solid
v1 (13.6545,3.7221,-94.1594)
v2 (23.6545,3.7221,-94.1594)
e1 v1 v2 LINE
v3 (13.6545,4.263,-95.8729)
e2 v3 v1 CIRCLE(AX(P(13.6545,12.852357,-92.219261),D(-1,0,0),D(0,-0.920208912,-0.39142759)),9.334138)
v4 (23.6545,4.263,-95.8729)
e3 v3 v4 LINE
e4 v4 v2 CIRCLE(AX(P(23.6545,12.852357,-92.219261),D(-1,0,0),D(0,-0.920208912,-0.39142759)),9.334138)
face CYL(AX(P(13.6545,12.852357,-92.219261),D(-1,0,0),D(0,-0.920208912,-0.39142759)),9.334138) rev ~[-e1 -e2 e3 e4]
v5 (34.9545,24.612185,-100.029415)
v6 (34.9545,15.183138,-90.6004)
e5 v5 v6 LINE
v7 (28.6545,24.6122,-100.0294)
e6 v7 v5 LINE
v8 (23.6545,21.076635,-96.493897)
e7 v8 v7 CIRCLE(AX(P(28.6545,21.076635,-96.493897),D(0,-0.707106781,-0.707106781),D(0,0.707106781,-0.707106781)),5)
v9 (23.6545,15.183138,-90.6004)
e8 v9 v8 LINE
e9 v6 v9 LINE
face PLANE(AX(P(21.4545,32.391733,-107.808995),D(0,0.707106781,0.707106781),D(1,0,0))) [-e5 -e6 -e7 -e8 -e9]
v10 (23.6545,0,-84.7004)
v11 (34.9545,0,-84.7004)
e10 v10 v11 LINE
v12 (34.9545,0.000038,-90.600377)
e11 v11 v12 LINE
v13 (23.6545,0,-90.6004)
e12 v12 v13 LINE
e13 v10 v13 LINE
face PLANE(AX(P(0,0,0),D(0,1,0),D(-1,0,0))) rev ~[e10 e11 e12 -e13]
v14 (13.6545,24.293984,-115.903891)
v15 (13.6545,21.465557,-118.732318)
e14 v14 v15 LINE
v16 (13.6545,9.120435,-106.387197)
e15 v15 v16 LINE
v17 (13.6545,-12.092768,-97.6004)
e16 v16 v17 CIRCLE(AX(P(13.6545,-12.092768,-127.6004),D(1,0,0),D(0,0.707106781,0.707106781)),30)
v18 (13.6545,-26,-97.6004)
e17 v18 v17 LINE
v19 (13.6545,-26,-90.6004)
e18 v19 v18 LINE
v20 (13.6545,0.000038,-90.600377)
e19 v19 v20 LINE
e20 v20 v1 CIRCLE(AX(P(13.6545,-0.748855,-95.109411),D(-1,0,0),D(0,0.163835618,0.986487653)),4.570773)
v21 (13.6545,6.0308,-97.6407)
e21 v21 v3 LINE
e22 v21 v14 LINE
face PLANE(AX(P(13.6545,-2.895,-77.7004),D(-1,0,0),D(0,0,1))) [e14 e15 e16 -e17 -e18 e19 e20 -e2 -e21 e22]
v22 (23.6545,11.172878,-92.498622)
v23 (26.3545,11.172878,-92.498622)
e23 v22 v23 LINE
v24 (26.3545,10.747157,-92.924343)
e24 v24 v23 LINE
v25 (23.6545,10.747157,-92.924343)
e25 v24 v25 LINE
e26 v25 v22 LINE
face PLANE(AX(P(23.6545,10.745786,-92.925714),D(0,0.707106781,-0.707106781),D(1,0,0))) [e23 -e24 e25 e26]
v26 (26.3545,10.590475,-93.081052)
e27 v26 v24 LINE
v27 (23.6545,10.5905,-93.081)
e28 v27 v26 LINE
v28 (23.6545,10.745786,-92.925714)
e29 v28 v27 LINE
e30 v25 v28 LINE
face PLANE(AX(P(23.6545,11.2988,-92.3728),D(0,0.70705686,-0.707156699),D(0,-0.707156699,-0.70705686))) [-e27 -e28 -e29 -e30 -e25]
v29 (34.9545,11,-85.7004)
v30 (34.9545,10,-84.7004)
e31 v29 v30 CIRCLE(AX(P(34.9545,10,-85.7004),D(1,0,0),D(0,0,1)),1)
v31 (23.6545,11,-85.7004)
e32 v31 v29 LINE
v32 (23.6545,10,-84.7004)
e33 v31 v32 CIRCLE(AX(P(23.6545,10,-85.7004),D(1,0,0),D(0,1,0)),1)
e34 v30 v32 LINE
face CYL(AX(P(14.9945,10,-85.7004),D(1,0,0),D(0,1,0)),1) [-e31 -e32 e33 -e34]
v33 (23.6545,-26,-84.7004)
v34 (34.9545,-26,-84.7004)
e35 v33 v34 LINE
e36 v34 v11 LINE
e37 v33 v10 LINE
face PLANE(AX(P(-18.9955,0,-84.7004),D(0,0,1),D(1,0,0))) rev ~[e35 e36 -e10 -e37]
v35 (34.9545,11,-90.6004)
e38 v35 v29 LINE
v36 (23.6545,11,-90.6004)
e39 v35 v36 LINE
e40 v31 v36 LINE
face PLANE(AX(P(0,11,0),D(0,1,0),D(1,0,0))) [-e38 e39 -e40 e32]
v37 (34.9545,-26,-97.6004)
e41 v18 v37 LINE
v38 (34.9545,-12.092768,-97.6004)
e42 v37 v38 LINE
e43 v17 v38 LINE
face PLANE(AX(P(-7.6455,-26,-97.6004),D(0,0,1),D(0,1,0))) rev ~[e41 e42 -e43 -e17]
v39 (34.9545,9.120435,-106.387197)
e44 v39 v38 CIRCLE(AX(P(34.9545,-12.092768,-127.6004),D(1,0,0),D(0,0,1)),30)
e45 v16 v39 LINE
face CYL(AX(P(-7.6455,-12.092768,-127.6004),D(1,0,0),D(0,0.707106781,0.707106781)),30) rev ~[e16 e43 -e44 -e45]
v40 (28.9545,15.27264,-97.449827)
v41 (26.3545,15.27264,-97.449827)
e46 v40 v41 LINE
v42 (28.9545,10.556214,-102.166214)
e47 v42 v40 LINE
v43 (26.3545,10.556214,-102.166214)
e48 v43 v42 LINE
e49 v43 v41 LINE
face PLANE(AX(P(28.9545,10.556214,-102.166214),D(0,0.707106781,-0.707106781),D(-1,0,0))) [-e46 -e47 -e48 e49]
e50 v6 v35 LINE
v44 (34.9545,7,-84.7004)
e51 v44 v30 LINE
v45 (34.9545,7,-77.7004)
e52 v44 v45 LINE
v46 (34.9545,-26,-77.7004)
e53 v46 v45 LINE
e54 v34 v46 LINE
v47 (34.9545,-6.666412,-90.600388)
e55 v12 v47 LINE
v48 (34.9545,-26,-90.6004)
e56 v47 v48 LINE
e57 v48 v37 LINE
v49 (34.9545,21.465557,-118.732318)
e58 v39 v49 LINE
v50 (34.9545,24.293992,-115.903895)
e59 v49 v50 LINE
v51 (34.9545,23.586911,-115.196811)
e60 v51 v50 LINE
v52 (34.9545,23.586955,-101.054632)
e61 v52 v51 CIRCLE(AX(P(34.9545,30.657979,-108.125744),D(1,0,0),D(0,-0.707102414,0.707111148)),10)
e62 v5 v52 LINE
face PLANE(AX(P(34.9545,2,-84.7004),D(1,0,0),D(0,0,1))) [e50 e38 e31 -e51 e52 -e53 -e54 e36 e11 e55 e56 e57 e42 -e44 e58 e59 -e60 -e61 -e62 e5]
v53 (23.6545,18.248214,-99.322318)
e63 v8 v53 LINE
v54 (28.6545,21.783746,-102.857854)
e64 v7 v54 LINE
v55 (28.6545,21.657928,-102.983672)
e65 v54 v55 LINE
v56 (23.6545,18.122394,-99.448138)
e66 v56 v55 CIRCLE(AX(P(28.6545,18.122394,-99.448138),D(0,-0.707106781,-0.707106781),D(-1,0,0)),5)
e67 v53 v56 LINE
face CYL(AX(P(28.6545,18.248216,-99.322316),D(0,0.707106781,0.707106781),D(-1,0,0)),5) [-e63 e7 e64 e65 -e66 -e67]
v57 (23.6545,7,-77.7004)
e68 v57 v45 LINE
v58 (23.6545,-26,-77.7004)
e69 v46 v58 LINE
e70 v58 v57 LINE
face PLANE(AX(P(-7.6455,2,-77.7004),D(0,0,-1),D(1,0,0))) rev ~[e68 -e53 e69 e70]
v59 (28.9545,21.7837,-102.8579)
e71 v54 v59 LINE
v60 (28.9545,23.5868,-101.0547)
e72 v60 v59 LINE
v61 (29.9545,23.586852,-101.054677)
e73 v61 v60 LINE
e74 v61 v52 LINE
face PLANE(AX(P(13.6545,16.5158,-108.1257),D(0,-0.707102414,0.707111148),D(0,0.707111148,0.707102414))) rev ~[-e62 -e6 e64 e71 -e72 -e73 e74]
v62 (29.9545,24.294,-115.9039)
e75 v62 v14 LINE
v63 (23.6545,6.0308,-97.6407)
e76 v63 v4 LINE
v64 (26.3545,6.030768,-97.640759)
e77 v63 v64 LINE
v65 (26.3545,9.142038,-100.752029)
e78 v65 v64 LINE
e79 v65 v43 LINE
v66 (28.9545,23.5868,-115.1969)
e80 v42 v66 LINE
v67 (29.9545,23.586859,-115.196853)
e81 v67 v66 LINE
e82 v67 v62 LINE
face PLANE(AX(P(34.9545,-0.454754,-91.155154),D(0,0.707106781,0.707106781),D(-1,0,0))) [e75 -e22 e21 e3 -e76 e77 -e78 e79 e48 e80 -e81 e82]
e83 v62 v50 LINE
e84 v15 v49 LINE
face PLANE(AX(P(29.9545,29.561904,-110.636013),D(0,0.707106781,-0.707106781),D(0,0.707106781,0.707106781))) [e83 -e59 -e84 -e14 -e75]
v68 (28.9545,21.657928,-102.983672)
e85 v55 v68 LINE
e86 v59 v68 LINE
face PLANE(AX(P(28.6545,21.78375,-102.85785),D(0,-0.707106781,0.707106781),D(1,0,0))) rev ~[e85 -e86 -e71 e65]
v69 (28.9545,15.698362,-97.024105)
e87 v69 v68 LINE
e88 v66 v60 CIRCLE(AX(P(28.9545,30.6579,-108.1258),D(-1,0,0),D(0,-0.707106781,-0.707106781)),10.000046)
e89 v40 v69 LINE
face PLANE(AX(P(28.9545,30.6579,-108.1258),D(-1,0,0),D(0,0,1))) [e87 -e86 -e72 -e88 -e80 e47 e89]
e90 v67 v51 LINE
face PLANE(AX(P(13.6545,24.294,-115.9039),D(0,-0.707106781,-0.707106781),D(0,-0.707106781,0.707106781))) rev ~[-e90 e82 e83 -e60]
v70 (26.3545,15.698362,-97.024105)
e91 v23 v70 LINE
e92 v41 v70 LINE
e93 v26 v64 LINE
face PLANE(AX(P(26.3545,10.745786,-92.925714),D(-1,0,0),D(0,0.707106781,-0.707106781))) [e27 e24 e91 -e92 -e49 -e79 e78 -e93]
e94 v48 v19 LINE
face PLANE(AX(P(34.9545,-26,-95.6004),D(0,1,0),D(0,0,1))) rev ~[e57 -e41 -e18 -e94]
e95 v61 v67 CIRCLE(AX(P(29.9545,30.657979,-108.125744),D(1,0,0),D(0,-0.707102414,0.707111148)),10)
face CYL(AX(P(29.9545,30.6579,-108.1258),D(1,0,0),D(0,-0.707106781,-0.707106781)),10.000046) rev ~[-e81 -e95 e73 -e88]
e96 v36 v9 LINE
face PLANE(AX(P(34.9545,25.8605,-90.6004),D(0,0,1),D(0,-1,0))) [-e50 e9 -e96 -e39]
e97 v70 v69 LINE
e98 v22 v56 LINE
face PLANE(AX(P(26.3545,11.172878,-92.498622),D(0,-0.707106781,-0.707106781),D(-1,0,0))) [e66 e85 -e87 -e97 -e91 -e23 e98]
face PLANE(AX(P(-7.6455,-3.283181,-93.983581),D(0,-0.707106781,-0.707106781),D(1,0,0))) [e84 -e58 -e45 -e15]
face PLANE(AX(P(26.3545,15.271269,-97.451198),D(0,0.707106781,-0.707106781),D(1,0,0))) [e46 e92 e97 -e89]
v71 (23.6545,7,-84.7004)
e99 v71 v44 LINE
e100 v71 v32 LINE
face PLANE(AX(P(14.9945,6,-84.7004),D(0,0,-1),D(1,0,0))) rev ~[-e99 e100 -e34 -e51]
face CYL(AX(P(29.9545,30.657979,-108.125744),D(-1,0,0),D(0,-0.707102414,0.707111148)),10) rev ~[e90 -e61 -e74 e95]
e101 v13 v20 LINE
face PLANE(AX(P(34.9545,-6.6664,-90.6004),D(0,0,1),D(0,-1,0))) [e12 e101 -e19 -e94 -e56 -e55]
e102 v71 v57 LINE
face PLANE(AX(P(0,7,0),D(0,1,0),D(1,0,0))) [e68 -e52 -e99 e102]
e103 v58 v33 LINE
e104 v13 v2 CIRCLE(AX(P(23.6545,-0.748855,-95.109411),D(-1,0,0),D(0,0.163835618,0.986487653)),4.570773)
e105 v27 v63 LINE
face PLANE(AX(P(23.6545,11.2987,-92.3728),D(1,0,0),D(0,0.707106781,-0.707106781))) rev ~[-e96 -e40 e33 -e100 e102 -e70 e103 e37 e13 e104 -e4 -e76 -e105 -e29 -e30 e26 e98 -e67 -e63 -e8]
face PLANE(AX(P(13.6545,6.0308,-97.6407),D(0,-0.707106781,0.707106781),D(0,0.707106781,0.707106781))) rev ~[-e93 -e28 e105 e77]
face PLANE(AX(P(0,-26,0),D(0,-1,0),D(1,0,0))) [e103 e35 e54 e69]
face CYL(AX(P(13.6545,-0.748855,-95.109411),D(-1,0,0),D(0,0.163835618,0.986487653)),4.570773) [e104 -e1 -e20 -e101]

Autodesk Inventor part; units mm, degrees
ref_plane "YZ Plane" through (0, 0, 0) normal (1, 0, 0) x (0, 1, 0)
ref_plane "XZ Plane" through (0, 0, 0) normal (0, 1, 0) x (-1, 0, 0)
ref_plane "XY Plane" through (0, 0, 0) normal (0, 0, 1) x (1, 0, 0)
sketch "Sketch1" plane through (0, 0, 0) normal (0, 1, 0) x (-1, 0, 0)
  line L0 (23.4955, 9.8996) -> (-50.8045, 9.8996)
  line L1 (-50.8045, 9.8996) -> (-50.8045, -84.7004)
  line L2 (-50.8045, -84.7004) -> (23.4955, -84.7004)
  line L3 (23.4955, -84.7004) -> (23.4955, 9.8996)
  line L4 (29.4455, 15.7996) -> (-56.7545, 15.7996)
  line L5 (-56.7545, 15.7996) -> (-56.7545, -90.6004)
  line L6 (-56.7545, -90.6004) -> (29.4455, -90.6004)
  line L7 (29.4455, -90.6004) -> (29.4455, 15.7996)
  line L8 (29.4455, -37.4004) -> (-56.7545, -37.4004) construction
  line L9 (-13.6545, -90.6004) -> (-13.6545, 15.7996) construction
  dimension "d0" = 94.6
  dimension "d1" = 74.3
  dimension "d2" = 106.4
  dimension "d3" = 86.2
extrude "Extrusion1" add sketch "Sketch1" along normal blind 6
fillet "Fillet1" radius 4.5 4 edges at (-23.4955, 3, 9.8996) (50.8045, 3, 9.8996) (50.8045, 3, -84.7004) (-23.4955, 3, -84.7004)
fillet "Fillet2" radius 4.5 4 edges at (56.7545, 3, 15.7996) (-29.4455, 3, 15.7996) (56.7545, 3, -90.6004) (-29.4455, 3, -90.6004)
sketch "Sketch2" plane through (0, 0, 0) normal (0, -1, 0) x (1, 0, 0)
  line L0 (50.8045, -80.2004) -> (50.8045, 5.3996) projected
  arc A0 (46.3045, -84.7004) -> (50.8045, -80.2004) centre (46.3045, -80.2004) ccw projected
  line L1 (-18.9955, -84.7004) -> (46.3045, -84.7004) projected
  arc A1 (-23.4955, -80.2004) -> (-18.9955, -84.7004) centre (-18.9955, -80.2004) ccw projected
  line L2 (-23.4955, 5.3996) -> (-23.4955, -80.2004) projected
  arc A2 (-18.9955, 9.8996) -> (-23.4955, 5.3996) centre (-18.9955, 5.3996) ccw projected
  line L3 (46.3045, 9.8996) -> (-18.9955, 9.8996) projected
  arc A3 (50.8045, 5.3996) -> (46.3045, 9.8996) centre (46.3045, 5.3996) ccw projected
  line L4 (43.8045, -77.7004) -> (-16.4955, -77.7004)
  line L5 (-16.4955, -77.7004) -> (-16.4955, 2.8996)
  line L6 (-16.4955, 2.8996) -> (43.8045, 2.8996)
  line L7 (43.8045, 2.8996) -> (43.8045, -77.7004)
  line L8 (13.6545, -84.7004) -> (13.6545, 9.8996) construction
  line L9 (46.3045, 9.8996) -> (-18.9955, 9.8996) construction
  line L10 (50.8045, -80.2004) -> (50.8045, 5.3996) construction
  line L11 (50.8045, -37.4004) -> (-23.4955, -37.4004) construction
  line L12 (56.7545, 11.2996) -> (56.7545, -86.1004) construction
  point P0 (0, 0)
  dimension "d8" = 5.95
  dimension "d9" = 7
  dimension "d10" = 7
extrude "Extrusion2" add sketch "Sketch2" along normal blind 6
fillet "Fillet3" radius 4.5 4 edges at (43.8045, -3, -77.7004) (43.8045, -3, 2.8996) (-16.4955, -3, 2.8996) (-16.4955, -3, -77.7004)
sketch "Sketch3" plane through (0, 0, 0) normal (0, 1, 0) x (1, 0, 0)
  arc A0 (46.3045, -9.8996) -> (50.8045, -5.3996) centre (46.3045, -5.3996) ccw projected
  line L0 (50.8045, 80.2004) -> (50.8045, -5.3996) projected
  arc A1 (50.8045, 80.2004) -> (46.3045, 84.7004) centre (46.3045, 80.2004) ccw projected
  line L1 (-18.9955, 84.7004) -> (46.3045, 84.7004) projected
  arc A2 (-18.9955, 84.7004) -> (-23.4955, 80.2004) centre (-18.9955, 80.2004) ccw projected
  line L2 (-23.4955, -5.3996) -> (-23.4955, 80.2004) projected
  arc A3 (-23.4955, -5.3996) -> (-18.9955, -9.8996) centre (-18.9955, -5.3996) ccw projected
  line L3 (46.3045, -9.8996) -> (-18.9955, -9.8996) projected
  arc A4 (43.8045, 73.2004) -> (39.3045, 77.7004) centre (39.3045, 73.2004) ccw projected
  line L4 (43.8045, 1.6004) -> (43.8045, 73.2004) projected
  arc A5 (39.3045, -2.8996) -> (43.8045, 1.6004) centre (39.3045, 1.6004) ccw projected
  line L5 (-11.9955, -2.8996) -> (39.3045, -2.8996) projected
  arc A6 (-16.4955, 1.6004) -> (-11.9955, -2.8996) centre (-11.9955, 1.6004) ccw projected
  line L6 (-16.4955, 73.2004) -> (-16.4955, 1.6004) projected
  arc A7 (-11.9955, 77.7004) -> (-16.4955, 73.2004) centre (-11.9955, 73.2004) ccw projected
  line L7 (39.3045, 77.7004) -> (-11.9955, 77.7004) projected
  point P0 (0, 0)
extrude "Extrusion3" add sketch "Sketch3" along normal blind 2
ref_plane "Work Plane1" through (-23.4955, 6, -84.7004) normal (0, 0.7071068, -0.7071068) x (1, 0, 0)
sketch "Sketch5" plane through (-23.4955, 6, -84.7004) normal (0, 0.7071068, -0.7071068) x (1, 0, 0)
  line L0 (4.5, 0) -> (69.8, 0) projected
  line L1 (37.15, 0) -> (37.15, -42.3796) construction
  circle A0 centre (37.15, 1.34) radius 1.34 construction
  line L2 (37.15, 1.34) -> (37.15, -18.66) construction
  line L3 (38.49, 1.34) -> (38.49, -18.66)
  line L4 (35.81, -18.66) -> (35.81, 1.34)
  arc A1 (38.49, 1.34) -> (35.81, 1.34) centre (37.15, 1.34) ccw
  arc A2 (35.81, -18.66) -> (38.49, -18.66) centre (37.15, -18.66) ccw
  point P0 (23.4955, -55.6496)
  point P1 (37.15, -8.66)
  dimension "d20" = 2.68
  dimension "d19" = 90
  dimension "d21" = 20
  dimension "d22" = 2.68
extrude "Extrusion5" cut sketch "Sketch5" along normal mid plane 51.82
sketch "Sketch6" plane through (-23.4955, 6, -84.7004) normal (0, 0.7071068, -0.7071068) x (1, 0, 0)
  arc A0 (38.49, 1.34) -> (35.81, 1.34) centre (37.15, 1.34) ccw projected
  line L0 (38.49, 0) -> (38.49, 1.34) projected
  arc A1 (38.49, 1.34) -> (35.81, 1.34) centre (37.15, 1.34) ccw projected
  line L1 (35.81, 1.34) -> (35.81, 0) projected
  line L2 (4.5, 0) -> (35.81, 0) projected
  line L3 (4.5, 2.8284) -> (4.5, 0) projected
  line L4 (4.5, 2.8284) -> (69.8, 2.8284) projected
  line L5 (69.8, 0) -> (69.8, 2.8284) projected
  line L6 (38.49, 0) -> (69.8, 0) projected
  line L7 (75.75, 8.4146) -> (-1.45, 8.4146) projected
  line L8 (74.9473, 2.68) -> (-18.0058, 2.68) construction
  line L9 (0, -55.225) -> (0, 5.3033) construction
  line L10 (90.8097, 9.1284) -> (-67.1811, 9.1284) construction
  line L11 (37.15, 2.68) -> (37.15, 37.6448) construction
  line L12 (58.45, 9.1284) -> (15.85, 9.1284)
  line L13 (15.85, 9.1284) -> (15.85, 13.1284)
  line L14 (15.85, 13.1284) -> (58.45, 13.1284)
  line L15 (58.45, 13.1284) -> (58.45, 9.1284)
  point P0 (23.4955, -55.6496)
  dimension "d25" = 6.3
  dimension "d26" = 42.6
  dimension "d27" = 4
extrude "Extrusion6" add sketch "Sketch6" along normal blind 35 contours L12 L13 L14 L15
sketch "Sketch7" plane through (-23.4955, 30.7487, -109.4492) normal (0, 0.7071068, -0.7071068) x (-1, 0, 0)
  line L0 (-15.85, -13.1284) -> (-15.85, -9.1284) projected
  line L1 (-58.45, -9.1284) -> (-58.45, -13.1284) projected
  point P0 (-23.4955, 55.6496)
  point P1 (-15.85, -11.1284)
  point P2 (-58.45, -11.1284)
  dimension "d30" = 42.6
sketch "Sketch8" plane through (34.9545, -3.2832, -93.9836) normal (1, 0, 0) x (0, 0.7071068, -0.7071068)
  line L0 (-0.0707, 4.7139) -> (-3.2527, 7.8958) projected
  line L1 (0.9899, 12.1385) -> (4.1719, 8.9565) projected
  line L2 (0, 0) -> (35, 0) projected
  line L3 (-0.0707, 4.7139) -> (-14.2134, -9.4288) construction
  line L4 (0, 4) -> (35, 4) projected
  line L5 (0, 4) -> (0, 0) projected
  line L6 (4.1719, 8.9565) -> (-4.7846, 0)
  line L7 (-4.7846, 0) -> (0, 0)
  line L8 (0, 0) -> (0, 4) projected
  line L9 (0, 0) -> (0, 4)
  line L10 (4.1719, 8.9565) -> (4.1719, 4)
  line L11 (0, 4) -> (35, 4) projected
  line L12 (4.1719, 4) -> (0, 4)
  line L13 (-0.0707, 4.7139) -> (4.1719, 8.9565) projected
  point P0 (-64.1349, 68.778)
  point P1 (4.1719, 4)
extrude "Extrusion7" add sketch "Sketch8" against normal blind 42.6
sketch "Sketch9" plane through (34.9545, -6.6664, -90.6004) normal (1, 0, 0) x (0, 0, -1)
  line L0 (0, 6.6664) -> (0, 0) projected
  line L1 (0, 0) -> (28.1319, 28.1319) projected
  line L2 (0, 0) -> (0, 6.6664) projected
  line L3 (0, 0) -> (0, -20)
  line L4 (0, -20) -> (5, -20)
  line L5 (5, -20) -> (5, 5)
  line L6 (0, 0) -> (28.1319, 28.1319) projected
  line L7 (5, 5) -> (0, 0)
  point P0 (-90.6004, 6.6664)
  point P1 (5, 5)
  dimension "d33" = 5
  dimension "d34" = 20
extrude "Extrusion8" add sketch "Sketch9" against normal blind 42.6
sketch "Sketch10" plane through (-7.6455, 24.294, -115.9039) normal (0, 0.7071068, 0.7071068) x (1, 0, 0)
  line L0 (0, -30.8281) -> (42.6, -30.8281) projected
  line L1 (42.6, -30.8281) -> (42.6, 0) projected
  line L2 (0, 0) -> (42.6, 0) projected
  line L3 (0, -30.8281) -> (0, 0) projected
  line L4 (42.6, -30.8281) -> (0, -30.8281) projected
  line L5 (0, -30.8281) -> (5, -30.8281)
  line L6 (5, -30.8281) -> (5, 0)
  line L7 (5, 0) -> (0, 0)
  line L8 (0, 0) -> (0, -30.8281)
  line L9 (42.6, 0) -> (0, 0) projected
  line L10 (37.6, 0) -> (42.6, 0)
  line L11 (42.6, 0) -> (42.6, -30.8281)
  line L12 (42.6, -30.8281) -> (37.6, -30.8281)
  line L13 (37.6, -30.8281) -> (37.6, 0)
  point P0 (7.6455, -99.1349)
  point P1 (37.6, 0)
  point P2 (37.6, -30.8281)
  dimension "d37" = 5
  dimension "d38" = 5
extrude "Extrusion9" add sketch "Sketch10" along normal blind 19 contours L3 L2 L6 L0 | L13 L2 L1 L0
sketch "Sketch11" plane through (-7.6455, 37.729, -102.4689) normal (0, 0.7071068, 0.7071068) x (1, 0, 0)
  line L0 (0, -30.8281) -> (5, -30.8281) projected
  line L1 (5, 0) -> (0, 0) projected
  point P0 (7.6455, -99.1349)
  point P1 (2.5, 0)
  point P2 (2.5, -30.8281)
  dimension "d41" = 30.8281
sketch "Sketch12" plane through (-2.6455, 2.4952, -94.1052) normal (1, 0, 0) x (0, -0.7071068, -0.7071068)
  line L0 (0, 30.8281) -> (0, 0) projected
  line L1 (0, 30.8281) -> (-19, 30.8281) projected
  line L2 (-19, 0) -> (-19, 30.8281) projected
  line L3 (-4.9565, 0) -> (-19, 0) projected
  line L4 (0, 0) -> (-4.9565, 0) projected
  line L5 (-19, 30.8281) -> (-15, 30.8281)
  line L6 (-15, 30.8281) -> (-15, 0)
  line L7 (-15, 0) -> (-19, 0)
  line L8 (-19, 0) -> (-19, 30.8281)
  point P0 (-64.778, -68.3068)
  dimension "d42" = 15
extrude "Extrusion10" add sketch "Sketch12" along normal blind 8.5 contours L6 L3 L2 L1
sketch "Sketch13" plane through (29.9545, 2.4952, -94.1052) normal (-1, 0, 0) x (0, 0.7071068, 0.7071068)
  line L0 (0, 0) -> (0, 30.8281) projected
  line L1 (4.9565, 0) -> (0, 0) projected
  line L2 (4.9565, 0) -> (19, 0) projected
  line L3 (19, 30.8281) -> (19, 0) projected
  line L4 (0, 30.8281) -> (19, 30.8281) projected
  line L5 (19, 30.8281) -> (7.45, 30.8281)
  line L6 (7.45, 30.8281) -> (7.45, 0)
  line L7 (7.45, 0) -> (19, 0)
  line L8 (19, 0) -> (19, 30.8281)
  point P0 (64.778, -68.3068)
  point P1 (7.45, 30.8281)
  dimension "d45" = 7.45
extrude "Extrusion11" add sketch "Sketch13" along normal blind 8.5 contours L4 L3 L2 L6
sketch "Sketch14" plane through (34.9545, -26.6664, -90.6004) normal (1, 0, 0) x (0, 0, -1)
  line L0 (5, 25) -> (28.1319, 48.1319) projected
  line L1 (28.1319, 48.1319) -> (11.8685, 64.3954) projected
  line L2 (-9.9303, 42.5967) -> (11.8685, 64.3954) projected
  line L3 (0, 32.6664) -> (-9.9303, 42.5967) projected
  line L4 (0, 26.6664) -> (0, 32.6664) projected
  line L5 (0, 26.6664) -> (0, 0) projected
  line L6 (0, 0) -> (5, 0) projected
  line L7 (5, 0) -> (5, 25) projected
  line L8 (0, 32.6664) -> (3.5048, 29.1616) construction
  line L9 (-9.9303, 42.5967) -> (11.8685, 64.3954) construction
  line L10 (-7.1018, 39.7682) -> (14.6969, 61.567) construction
  line L11 (0, 32.6664) -> (-1.7632, 34.4296) projected
  line L12 (0, 52.5269) -> (0, 32.6664)
  line L13 (-1.7632, 34.4296) -> (-9.9303, 42.5967) projected
  line L14 (0, 32.6664) -> (-9.9303, 42.5967)
  line L15 (-9.9303, 42.5967) -> (0, 52.5269)
  point P0 (-90.6004, 26.6664)
  point P1 (11.8685, 64.3954)
  point P2 (0, 52.5269)
extrude "Extrusion12" cut sketch "Sketch14" against normal blind 100 contours L12 L3 L2
sketch "Sketch15" plane through (-23.4955, 30.7487, -109.4492) normal (0, 0.7071068, -0.7071068) x (-1, 0, 0)
  line L0 (-58.45, -13.1284) -> (-15.85, -13.1284) projected
  line L1 (-15.85, -13.1284) -> (-15.85, 9.8716) projected
  line L2 (-15.85, 9.8716) -> (-29.35, 9.8716) projected
  line L3 (-29.35, 5.8716) -> (-29.35, 9.8716) projected
  line L4 (-20.85, 5.8716) -> (-29.35, 5.8716) projected
  line L5 (-20.85, -9.1284) -> (-20.85, 5.8716) projected
  line L6 (-20.85, -9.1284) -> (-53.45, -9.1284) projected
  line L7 (-53.45, -9.1284) -> (-53.45, -1.6784) projected
  line L8 (-53.45, -1.6784) -> (-44.95, -1.6784) projected
  line L9 (-44.95, 9.8716) -> (-44.95, -1.6784) projected
  line L10 (-58.45, 9.8716) -> (-44.95, 9.8716) projected
  line L11 (-58.45, -13.1284) -> (-58.45, 9.8716) projected
  line L12 (-58.45, 9.8716) -> (-44.95, 9.8716)
  line L13 (-44.95, 9.8716) -> (-44.95, 2.3216)
  line L14 (-44.95, 2.3216) -> (-58.45, 2.3216)
  line L15 (-58.45, 2.3216) -> (-58.45, 9.8716)
  point P0 (-23.4955, 55.6496)
  point P1 (-51.7, 2.3216)
  point P2 (-58.45, 2.3216)
  dimension "d52" = 4
extrude "Extrusion13" cut sketch "Sketch15" against normal blind 100 contours L11 L10 L9 L14
sketch "Sketch16" plane through (-2.6455, 24.294, -115.9039) normal (0, 0.7071068, 0.7071068) x (1, 0, 0)
  line L0 (32.6, -30.8281) -> (0, -30.8281) projected
  line L1 (8.5, -20.7846) -> (0, -20.7846) projected
  point P0 (2.6455, -99.1349)
  dimension "d55" = 10.0435
sketch "Sketch17" plane through (-2.6455, 6, -90.6004) normal (1, 0, 0) x (0, 0, -1)
  line L0 (0, 14.2037) -> (0, 0) projected
  line L1 (3.5048, -3.5048) -> (0, 0) projected
  line L2 (25.3035, 18.294) -> (3.5048, -3.5048) projected
  line L3 (25.3035, 18.294) -> (14.6969, 28.9006) projected
  line L4 (14.6969, 28.9006) -> (0, 14.2037) projected
  line L5 (5.6261, -1.3835) -> (3.5048, -3.5048)
  line L6 (3.5048, -3.5048) -> (0, 0)
  line L7 (0, 0) -> (2.1213, 2.1213)
  line L8 (2.1213, 2.1213) -> (5.6261, -1.3835)
  point P0 (-90.6004, -6)
  dimension "d56" = 3
extrude "Extrusion14" add sketch "Sketch17" along normal blind 34.75 contours L7 L8 L2 L1
sketch "Sketch18" plane through (0, -6, 0) normal (0, -1, 0) x (1, 0, 0)
  line L0 (-18.9955, -84.7004) -> (46.3045, -84.7004) projected
  line L1 (39.3045, -77.7004) -> (-11.9955, -77.7004) projected
  line L2 (-7.6455, -95.6004) -> (-7.6455, -90.6004) projected
  line L3 (34.9545, -90.6004) -> (34.9545, -95.6004) projected
  line L4 (-18.9955, -84.7004) -> (46.3045, -84.7004) projected
  line L5 (-7.6455, -84.7004) -> (34.9545, -84.7004)
  line L6 (34.9545, -84.7004) -> (34.9545, -77.7004)
  line L7 (34.9545, -77.7004) -> (-7.6455, -77.7004)
  line L8 (-7.6455, -77.7004) -> (-7.6455, -84.7004)
  point P0 (0, 0)
extrude "Extrusion15" add sketch "Sketch18" along normal blind 20
fillet "Fillet5" radius 5 2 edges at (5.8545, 36.3148, -103.8831) (21.4545, 30.9761, -109.2218)
sketch "Sketch19" plane through (0, -6, 0) normal (0, -1, 0) x (1, 0, 0)
  line L0 (34.9545, -118.7324) -> (-7.6455, -118.7324) projected
  line L1 (34.9545, -95.6004) -> (34.9545, -118.7324) projected
  line L2 (34.9545, -77.7004) -> (-7.6455, -77.7004) projected
  line L3 (34.9545, -84.7004) -> (34.9545, -77.7004) projected
  line L4 (-7.6455, -77.7004) -> (-7.6455, -84.7004) projected
  line L5 (-7.6455, -95.6004) -> (-7.6455, -118.7324) projected
  line L6 (34.9545, -118.7324) -> (-7.6455, -118.7324)
  line L7 (-7.6455, -118.7324) -> (-7.6455, -77.7004)
  line L8 (-7.6455, -77.7004) -> (34.9545, -77.7004)
  line L9 (34.9545, -77.7004) -> (34.9545, -118.7324)
  point P0 (0, 0)
  point P1 (34.9545, -84.7004)
  point P2 (-7.6455, -84.7004)
extrude "Extrusion16" cut sketch "Sketch19" along normal mid plane 100 keep common part
sketch "Sketch20" plane through (34.9545, 2, -77.7004) normal (1, 0, 0) x (0, 0, -1)
  line L0 (7, -28) -> (0, -28) projected
  line L1 (7, -2) -> (7, -28) construction
  line L2 (7, -28) -> (31.0161, -28) construction
  line L3 (17.9, -28.6664) -> (12.9, -28.6664) projected
  line L4 (12.9, -28.6664) -> (17.9, -28.6664)
  line L5 (17.9, -28.6664) -> (17.9, -28)
  line L6 (17.9, -28) -> (12.9, -28)
  line L7 (12.9, -28) -> (12.9, -28.6664)
  point P0 (-77.7004, -2)
  point P1 (17.9, -28.6664)
extrude "Extrusion17" cut sketch "Sketch20" against normal blind 100
sketch "Sketch21" plane through (0, 6, 0) normal (0, 1, 0) x (1, 0, 0)
  line L0 (-7.6455, 84.7004) -> (-7.6455, 90.6004) projected
  line L1 (-7.6455, 84.7004) -> (12.3145, 84.7004) projected
  line L2 (12.3145, 84.7004) -> (12.3145, 86.5955) projected
  ellipse E0 centre (13.6545, 86.5955) end of major axis (13.6545, 88.4905) minor radius 1.34 (14.9945, 86.5955) -> (12.3145, 86.5955) ccw projected
  line L3 (14.9945, 86.5955) -> (14.9945, 84.7004) projected
  line L4 (14.9945, 84.7004) -> (34.9545, 84.7004) projected
  line L5 (34.9545, 90.6004) -> (34.9545, 84.7004) projected
  line L6 (34.9545, 90.6004) -> (29.9545, 90.6004) projected
  line L7 (29.9545, 90.6004) -> (-2.6455, 90.6004) projected
  line L8 (-2.6455, 90.6004) -> (-7.6455, 90.6004) projected
  point P0 (0, 0)
extrude "Extrusion18" add sketch "Sketch21" along normal blind 5
sketch "Sketch22" plane through (0, 2, 0) normal (0, 1, 0) x (1, 0, 0)
  line L0 (-7.6455, 77.7004) -> (-7.6455, 84.7004) projected
  line L1 (-7.6455, 77.7004) -> (12.3145, 77.7004) projected
  line L2 (12.3145, 77.7004) -> (12.3145, 82.5955) projected
  ellipse E0 centre (13.6545, 82.5955) end of major axis (13.6545, 84.4905) minor radius 1.34 (14.9945, 82.5955) -> (12.3145, 82.5955) ccw projected
  line L3 (14.9945, 82.5955) -> (14.9945, 77.7004) projected
  line L4 (14.9945, 77.7004) -> (34.9545, 77.7004) projected
  line L5 (34.9545, 84.7004) -> (34.9545, 77.7004) projected
  line L6 (-7.6455, 84.7004) -> (34.9545, 84.7004) projected
  point P0 (0, 0)
extrude "Extrusion19" add sketch "Sketch22" along normal blind 5
sketch "Sketch23" plane through (-23.4955, 6, -84.7004) normal (0, 0.7071068, -0.7071068) x (1, 0, 0)
  arc A0 (38.49, 1.34) -> (35.81, 1.34) centre (37.15, 1.34) ccw projected
  line L0 (37.15, 1.34) -> (37.15, -18.66) construction
  line L1 (35.81, 1.34) -> (35.81, -18.66)
  line L2 (38.49, -18.66) -> (38.49, 1.34)
  arc A1 (38.49, 1.34) -> (35.81, 1.34) centre (37.15, 1.34) ccw
  arc A2 (35.81, -18.66) -> (38.49, -18.66) centre (37.15, -18.66) ccw
  point P0 (23.4955, -55.6496)
  point P1 (37.15, -8.66)
  dimension "d70" = 20
extrude "Extrusion20" cut sketch "Sketch23" along normal mid plane 100
sketch "Sketch24" plane through (-2.6455, 11, -90.6004) normal (1, 0, 0) x (0, 0, -1)
  line L0 (2.1213, -2.8787) -> (5.6261, -6.3835) projected
  line L1 (25.3035, 13.294) -> (5.6261, -6.3835) projected
  line L2 (25.3035, 13.294) -> (14.6969, 23.9006) projected
  line L3 (14.6969, 23.9006) -> (0, 9.2037) projected
  line L4 (0, 9.2037) -> (0, 0) projected
  line L5 (0, 0) -> (0, -5) projected
  line L6 (0, -5) -> (2.1213, -2.8787) projected
  line L7 (0, -0.7574) -> (2.1213, -2.8787)
  line L8 (0, -0.7574) -> (0, -5)
  line L9 (0, -11) -> (-5.9, -11) projected
  line L10 (0, -5) -> (2.1213, -2.8787)
  point P0 (-90.6004, -11)
extrude "Extrusion21" add sketch "Sketch24" along normal blind 33.25 contours L6 L5 L7
sketch "Sketch25" plane through (-23.4955, 6, -84.7004) normal (0, 0.7071068, -0.7071068) x (1, 0, 0)
  line L0 (35.81, 1.34) -> (35.81, -5.6569) projected
  line L1 (38.49, -5.6569) -> (38.49, 1.34) projected
  arc A0 (38.49, 1.34) -> (35.81, 1.34) centre (37.15, 1.34) ccw projected
  line L2 (37.15, 1.34) -> (37.15, -8.66) construction
  line L3 (35.81, 1.34) -> (35.81, -8.66)
  line L4 (38.49, -8.66) -> (38.49, 1.34)
  arc A1 (38.49, 1.34) -> (35.81, 1.34) centre (37.15, 1.34) ccw
  arc A2 (35.81, -8.66) -> (38.49, -8.66) centre (37.15, -8.66) ccw
  point P0 (23.4955, -55.6496)
  point P1 (37.15, -3.66)
  dimension "d75" = 10
extrude "Extrusion22" cut sketch "Sketch25" along normal mid plane 33.25
fillet "Fillet6" radius 1 2 edges at (2.3345, 11, -84.7004) (24.9745, 11, -84.7004)
fillet "Fillet7" radius 1 8 edges at (12.3145, 10.7071, -84.9933) (12.3145, 8.5, -84.7004) (12.3145, 11, -88.1504) (14.9945, 10.7071, -84.9933) (14.9945, 8.5, -84.7004) (14.9945, 11, -88.1504) (14.9945, 7, -81.2004) (12.3145, 7, -81.2004)
sketch "Sketch26" plane through (-7.6455, 0, -90.6004) normal (-1, 0, 0) x (0, 0, 1)
  line L0 (5.9, 0) -> (5.9, -26) projected
  line L1 (12.9, -26) -> (12.9, 7) projected
  line L2 (-5, -1.6664) -> (-5, -26) projected
  line L3 (0, -26) -> (0, 0) projected
  line L4 (-5, -26) -> (0, -26) projected
  line L5 (-5, -1.6664) -> (-28.1319, 21.4655) projected
  line L6 (-5, -26) -> (-5, -1.6664) projected
  line L7 (-5, -26) -> (-7, -26)
  line L8 (-7, -26) -> (-7, 0.3336)
  line L9 (-5, -1.6664) -> (-28.1319, 21.4655) projected
  line L10 (-7, 0.3336) -> (-5, -1.6664)
  line L11 (-5, -1.6664) -> (-5, -26)
  point P0 (90.6004, 0)
  point P1 (-7, 0.3336)
  dimension "d80" = 7
  dimension "d81" = 5
  dimension "d82" = 2
sketch "Sketch27" plane through (0, -26, 0) normal (0, -1, 0) x (1, 0, 0)
  line L0 (-7.6455, -77.7004) -> (-7.6455, -84.7004) projected
  line L1 (34.9545, -84.7004) -> (34.9545, -77.7004) projected
  point P0 (0, 0)
  point P1 (-7.6455, -81.2004)
  point P2 (34.9545, -81.2004)
  dimension "d83" = 42.6
extrude "Extrusion23" add sketch "Sketch26" against normal blind 42.6
fillet "Fillet8" radius 30 1 edges at (13.6545, 0.3336, -97.6004)
ref_plane "Work Plane2" through (13.6545, -2.895, -77.7004) normal (1, 0, 0) x (0, 0, -1)
sketch "Sketch28" plane through (13.6545, -2.895, -77.7004) normal (1, 0, 0) x (0, 0, -1)
  line L0 (45.7087, -33.5387) -> (-16.3366, -33.5387)
  line L1 (-16.3366, -33.5387) -> (-16.3366, 45.9991)
  line L2 (-16.3366, 45.9991) -> (45.7087, 45.9991)
  line L3 (45.7087, 45.9991) -> (45.7087, -33.5387)
  point P0 (-77.7004, 2.895)
extrude "Extrusion24" cut sketch "Sketch28" against normal blind 100
sketch "Sketch29" plane through (13.6545, -2.895, -77.7004) normal (-1, 0, 0) x (0, 0, 1)
  line L0 (-38.2035, 27.189) -> (-18.5261, 7.5116) projected
  line L1 (-30.1071, 35.2854) -> (-32.9356, 32.457) projected
  line L2 (-30.1071, 35.2854) -> (-26.5716, 31.7498) projected
  line L3 (-12.9, 18.0782) -> (-26.5716, 31.7498) projected
  line L4 (-18.5261, 7.5116) -> (-38.2035, 27.189) projected
  line L5 (-30.1071, 35.2854) -> (-38.2035, 27.189)
  line L6 (-38.2035, 27.189) -> (-30.4253, 19.4108)
  line L7 (-30.4253, 19.4108) -> (-22.329, 27.5072)
  line L8 (-22.329, 27.5072) -> (-30.1071, 35.2854)
  point P0 (77.7004, 2.895)
  dimension "d92" = 11
extrude "Extrusion25" cut sketch "Sketch29" against normal blind 100
sketch "Sketch30" plane through (13.6545, -2.895, -77.7004) normal (-1, 0, 0) x (0, 0, 1)
  line L0 (-13.9664, 12.0713) -> (0, -1.895) projected
  line L1 (-13.9664, 12.0713) -> (-13.0897, 12.948) projected
  line L2 (-12.9, 13.895) -> (-12.9, 18.0782) projected
  line L3 (0, 0) -> (0, -1.895) projected
  line L4 (0, 8.895) -> (0, 0) projected
  line L5 (0, 9.895) -> (-7, 9.895) projected
  line L6 (0, 9.895) -> (0, 8.895) projected
  line L7 (-8, 13.895) -> (-12.895, 13.895) projected
  arc A0 (-7, 12.895) -> (-8, 13.895) centre (-8, 12.895) ccw projected
  line L8 (-7, 9.895) -> (-7, 12.895) projected
  line L9 (-12.9, 13.1377) -> (-13.0897, 12.948) projected
  line L10 (-12.9, 13.895) -> (-12.9, 13.1377) projected
  line L11 (-12.9, 13.1377) -> (-12.9, 13.895) projected
  line L12 (-13.9664, 12.0713) -> (-12.9, 13.1377)
  line L13 (-12.9, 18.0782) -> (-12.9, 13.895) projected
  line L14 (-12.9, 13.1377) -> (-12.9, 18.0782)
  line L15 (-12.9, 18.0782) -> (0, 18.0782)
  line L16 (0, 18.0782) -> (0, -1.895)
  line L17 (0, -1.895) -> (-13.9664, 12.0713)
  point P0 (77.7004, 2.895)
extrude "Extrusion26" cut sketch "Sketch30" against normal blind 10
sketch "Sketch31" plane through (13.6545, -2.895, -77.7004) normal (-1, 0, 0) x (0, 0, 1)
  line L0 (-18.5261, 7.5116) -> (-13.9664, 12.0713) projected
  line L1 (-38.2035, 27.189) -> (-18.5261, 7.5116) projected
  line L2 (-18.5261, 7.5116) -> (-13.2581, 12.7795) projected
  line L3 (-13.9664, 12.0713) -> (-18.5261, 7.5116)
  line L4 (-18.5261, 7.5116) -> (-19.9403, 8.9258)
  line L5 (-19.9403, 8.9258) -> (-15.3806, 13.4855)
  line L6 (-15.3806, 13.4855) -> (-13.9664, 12.0713)
  line L7 (-13.9664, 12.0713) -> (0, -1.895) projected
  point P0 (77.7004, 2.895)
  dimension "d97" = 2
extrude "Extrusion27" add sketch "Sketch31" against normal blind 17
sketch "Sketch32" plane through (29.9545, 9.8845, -90.9586) normal (-1, 0, 0) x (0, 0.7071068, 0.7071068)
  line L0 (-1.0016, 2) -> (-7.45, 2) projected
  line L1 (-7.45, 27.8281) -> (-7.45, 2) projected
  line L2 (0, 16.8281) -> (0, 0) projected
  line L3 (0, 0) -> (0, 16.8281) projected
  line L4 (-7.45, 2) -> (0, 2)
  line L5 (0, 2) -> (0, 6.4)
  line L6 (0, 6.4) -> (-7.45, 6.4)
  line L7 (-7.45, 6.4) -> (-7.45, 2)
  point P0 (57.328, -71.3068)
  point P1 (0, 6.4)
  point P2 (-7.45, 6.4)
  point P3 (-1.0016, 2)
  point P4 (0, 2)
  dimension "d100" = 4.4
extrude "Extrusion28" add sketch "Sketch32" along normal blind 3.6
sketch "Sketch33" plane through (21.4545, 15.1832, -90.6004) normal (0, 0.7071068, 0.7071068) x (1, 0, 0)
  line L0 (8.5, 2.9065) -> (8.5, 13.3346) projected
  line L1 (0, 13.3346) -> (0, -3.4935) projected
  line L2 (0, -3.4935) -> (0, 0) projected
  line L3 (0, 0) -> (0, 13.3346) projected
  line L4 (8.5, 13.3346) -> (0, 13.3346)
  line L5 (0, 13.3346) -> (0, -2.958)
  line L6 (0, -2.958) -> (8.5, -2.958)
  line L7 (8.5, -2.958) -> (8.5, 13.3346)
  line L8 (2.2, -2.958) -> (13.5, -2.958) projected
  line L9 (0, 13.3346) -> (1.5, 13.3346)
  line L10 (1.5, 13.3346) -> (1.5, -2.958)
  line L11 (1.5, -2.958) -> (0, -2.958)
  line L12 (0, -2.958) -> (0, 13.3346)
  point P0 (-21.4545, -74.8003)
  point P1 (13.5, 13.3346)
  point P2 (13.5, 0)
  point P3 (1.5, -2.958)
  point P4 (1.5, 13.3346)
  point P5 (0, 13.3346)
  point P6 (0, -2.958)
  dimension "d103" = 7
extrude "Extrusion29" cut sketch "Sketch33" against normal blind 4.35 contours L10 L6 L1 L4
sketch "Sketch34" plane through (13.6545, -2.895, -77.7004) normal (-1, 0, 0) x (0, 0, 1)
  line L0 (-15.3806, 13.4855) -> (-19.9403, 8.9258) projected
  line L1 (-15.3806, 13.4855) -> (0, -1.895) projected
  line L2 (-38.2035, 27.189) -> (-19.9403, 8.9258) projected
  line L3 (-15.3806, 13.4855) -> (-19.9403, 8.9258)
  line L4 (-19.9403, 8.9258) -> (-18.1725, 7.158)
  line L5 (-18.1725, 7.158) -> (-13.6128, 11.7178)
  line L6 (-13.6128, 11.7178) -> (-15.3806, 13.4855)
  point P0 (77.7004, 2.895)
  point P1 (-13.6128, 11.7178)
  dimension "d106" = 2.5
extrude "Extrusion30" cut sketch "Sketch34" against normal blind 10
sketch "Sketch35" plane through (22.9545, 15.1832, -90.6004) normal (0, 0.7071068, 0.7071068) x (1, 0, 0)
  line L0 (12, 13.3346) -> (0, 13.3346) projected
  line L1 (0.7, -2.958) -> (0.7, -6.4228) projected
  line L2 (0.7, -6.4228) -> (0.7, 13.3346)
  line L3 (0.7, 13.3346) -> (-4.3, 13.3346)
  line L4 (-4.3, 13.3346) -> (-4.3, -6.4228)
  line L5 (-4.3, -6.4228) -> (0.7, -6.4228)
  point P0 (-22.9545, -74.8003)
  point P1 (0.7, -2.958)
  point P2 (0, 13.3346)
  dimension "d109" = 5
extrude "Extrusion31" cut sketch "Sketch35" against normal blind 4.5
sketch "Sketch36" plane through (23.6545, -2.895, -77.7004) normal (-1, 0, 0) x (0, 0, 1)
  line L0 (-14.6724, 14.1938) -> (-15.3806, 13.4855) projected
  line L1 (-15.3806, 13.4855) -> (-13.9664, 12.0713) projected
  line L2 (-13.9664, 12.0713) -> (-13.2581, 12.7795) projected
  line L3 (-13.2581, 12.7795) -> (-14.6724, 14.1938) projected
  point P0 (77.7004, 2.895)
extrude "Extrusion32" add sketch "Sketch36" against normal blind 10.75
sketch "Sketch37" plane through (13.6545, -2.895, -77.7004) normal (-1, 0, 0) x (0, 0, 1)
  line L0 (-13.6128, 11.7178) -> (0, -1.895) projected
  line L1 (-13.6128, 11.7178) -> (-18.1725, 7.158) projected
  line L2 (-13.6128, 11.7178) -> (-18.1725, 7.158) projected
  line L3 (-16.7948, 8.5358) -> (-14.6735, 6.4145)
  arc A0 (-3.6254, 1.7304) -> (-14.6735, 6.4145) centre (-14.9391, -9.5833) ccw
  line L4 (0, -1.895) -> (-13.6128, 11.7178) projected
  line L5 (-16.7948, 8.5358) -> (-13.6128, 11.7178)
  line L6 (-13.6128, 11.7178) -> (-3.6254, 1.7304)
  point P0 (77.7004, 2.895)
  point P1 (-16.7948, 8.5358)
  dimension "d114" = 16
  dimension "d115" = 3
  dimension "d116" = 4.5
extrude "Extrusion33" cut sketch "Sketch37" against normal blind 10
fillet "Fillet9" radius 10 1 edges at (18.6545, -4.7901, -77.7004)
fillet "Fillet10" radius 5 1 edges at (23.6545, 23.1979, -101.4436)
fillet "Fillet11" radius 10 1 edges at (32.4545, 16.5158, -108.1258)
sketch "Sketch38" plane through (29.9545, 30.6579, -108.1258) normal (-1, 0, 0) x (0, 0, 1)
  line L0 (7.3738, -21.5159) -> (12.6417, -16.2479) projected
  line L1 (12.6417, -16.2479) -> (5.2679, -8.8742) projected
  line L2 (7.0711, -7.0711) -> (5.2679, -8.8742) projected
  arc A0 (-7.0711, -7.0711) -> (7.0711, -7.0711) centre (0, 0) ccw projected
  line L3 (7.3738, -21.5159) -> (-7.0711, -7.0711) projected
  point P0 (108.1258, -30.6579)
extrude "Extrusion34" add sketch "Sketch38" along normal blind 1
sketch "Sketch39" plane through (28.9545, 9.142, -100.752) normal (0, 0.7071068, -0.7071068) x (-1, 0, 0)
  line L0 (0, 7.45) -> (0, 0) projected
  line L1 (2.6, 0) -> (0, 0) projected
  line L2 (2.6, 7.45) -> (2.6, 0) projected
  line L3 (0, 7.45) -> (2.6, 7.45) projected
  point P0 (28.9545, 64.778)
extrude "Extrusion35" add sketch "Sketch39" along normal blind 2
sketch "Sketch40" plane through (13.6545, -2.895, -77.7004) normal (-1, 0, 0) x (0, 0, 1)
  line L0 (-16.7948, 8.5358) -> (-18.1725, 7.158) projected
  line L1 (-14.6735, 6.4145) -> (-16.7948, 8.5358) projected
  arc A0 (-18.1725, 7.158) -> (-14.6735, 6.4145) centre (-14.5185, 15.7485) ccw
  arc A1 (-3.6254, 1.7304) -> (-14.6735, 6.4145) centre (-14.9391, -9.5833) ccw projected
  point P0 (77.7004, 2.895)
extrude "Extrusion36" cut sketch "Sketch40" against normal blind 10
sketch "Sketch41" plane through (26.3545, 11.2987, -92.3728) normal (0, -0.7071068, -0.7071068) x (-1, 0, 0)
  line L0 (0, 6.4) -> (0, 0) projected
  line L1 (0, 0) -> (2.7, 0) projected
  line L2 (2.7, 0) -> (2.7, 9.8281) projected
  arc A0 (2.7, 9.8281) -> (-2.3, 14.8281) centre (-2.3, 9.8281) ccw projected
  line L3 (-2.3, 14.8281) -> (-2.6, 14.8281) projected
  line L4 (-2.6, 14.8281) -> (-2.6, 6.4) projected
  line L5 (-2.6, 6.4) -> (0, 6.4) projected
  point P0 (26.3545, -73.3068)
extrude "Extrusion37" add sketch "Sketch41" along normal blind 0.78
sketch "Sketch43" plane through (26.3545, 10.7472, -92.9243) normal (0, -0.7071068, -0.7071068) x (-1, 0, 0)
  line L0 (2.7, 0) -> (0, 0) projected
  line L1 (2.7, 0) -> (2.7, 9.8281) projected
  arc A0 (2.7, 9.8281) -> (-2.3, 14.8281) centre (-2.3, 9.8281) ccw projected
  line L2 (-2.3, 14.8281) -> (-2.6, 14.8281) projected
  line L3 (-2.6, 6.4) -> (-2.6, 14.8281) projected
  line L4 (0, 6.4) -> (-2.6, 6.4) projected
  line L5 (0, 0) -> (0, 6.4) projected
  point P0 (26.3545, -73.3068)
extrude "Extrusion39" cut sketch "Sketch43" against normal blind 0.6
sketch "Sketch44" plane through (13.6545, -2.895, -77.7004) normal (-1, 0, 0) x (0, 0, 1)
  arc A0 (-18.1725, 7.158) -> (-14.6735, 6.4145) centre (-14.5185, 15.7485) ccw projected
  line L0 (-38.2035, 27.189) -> (-18.1725, 7.158) projected
  line L1 (-41.0319, 24.3606) -> (-38.2035, 27.189) projected
  line L2 (-28.6868, 12.0154) -> (-41.0319, 24.3606) projected
  arc A1 (-19.9, -9.1978) -> (-28.6868, 12.0154) centre (-49.9, -9.1978) ccw projected
  line L3 (-19.9, -23.105) -> (-19.9, -9.1978) projected
  line L4 (-12.9, -23.105) -> (-19.9, -23.105) projected
  line L5 (-12.9, 2.895) -> (-12.9, -23.105) projected
  line L6 (-7, 2.895) -> (-12.9, 2.895) projected
  line L7 (-7, -23.105) -> (-7, 2.895) projected
  line L8 (0, -23.105) -> (-7, -23.105) projected
  line L9 (0, -6.0372) -> (0, -23.105) projected
  arc A2 (0, -6.0372) -> (-2.9289, 1.0339) centre (-10, -6.0372) ccw projected
  line L10 (-3.6254, 1.7304) -> (-2.9289, 1.0339) projected
  arc A3 (-3.6254, 1.7304) -> (-14.6735, 6.4145) centre (-14.9391, -9.5833) ccw projected
  arc A4 (-12.9, 2.895) -> (-16.459, 6.6171) centre (-17.4091, 2.1461) ccw
  point P0 (77.7004, 2.895)
extrude "Extrusion40" cut sketch "Sketch44" against normal blind 10 contours A0 A3 L10 A2 L9 L8 L7 L6 A4
properties part number "MPM_connector_holder_part_1"
